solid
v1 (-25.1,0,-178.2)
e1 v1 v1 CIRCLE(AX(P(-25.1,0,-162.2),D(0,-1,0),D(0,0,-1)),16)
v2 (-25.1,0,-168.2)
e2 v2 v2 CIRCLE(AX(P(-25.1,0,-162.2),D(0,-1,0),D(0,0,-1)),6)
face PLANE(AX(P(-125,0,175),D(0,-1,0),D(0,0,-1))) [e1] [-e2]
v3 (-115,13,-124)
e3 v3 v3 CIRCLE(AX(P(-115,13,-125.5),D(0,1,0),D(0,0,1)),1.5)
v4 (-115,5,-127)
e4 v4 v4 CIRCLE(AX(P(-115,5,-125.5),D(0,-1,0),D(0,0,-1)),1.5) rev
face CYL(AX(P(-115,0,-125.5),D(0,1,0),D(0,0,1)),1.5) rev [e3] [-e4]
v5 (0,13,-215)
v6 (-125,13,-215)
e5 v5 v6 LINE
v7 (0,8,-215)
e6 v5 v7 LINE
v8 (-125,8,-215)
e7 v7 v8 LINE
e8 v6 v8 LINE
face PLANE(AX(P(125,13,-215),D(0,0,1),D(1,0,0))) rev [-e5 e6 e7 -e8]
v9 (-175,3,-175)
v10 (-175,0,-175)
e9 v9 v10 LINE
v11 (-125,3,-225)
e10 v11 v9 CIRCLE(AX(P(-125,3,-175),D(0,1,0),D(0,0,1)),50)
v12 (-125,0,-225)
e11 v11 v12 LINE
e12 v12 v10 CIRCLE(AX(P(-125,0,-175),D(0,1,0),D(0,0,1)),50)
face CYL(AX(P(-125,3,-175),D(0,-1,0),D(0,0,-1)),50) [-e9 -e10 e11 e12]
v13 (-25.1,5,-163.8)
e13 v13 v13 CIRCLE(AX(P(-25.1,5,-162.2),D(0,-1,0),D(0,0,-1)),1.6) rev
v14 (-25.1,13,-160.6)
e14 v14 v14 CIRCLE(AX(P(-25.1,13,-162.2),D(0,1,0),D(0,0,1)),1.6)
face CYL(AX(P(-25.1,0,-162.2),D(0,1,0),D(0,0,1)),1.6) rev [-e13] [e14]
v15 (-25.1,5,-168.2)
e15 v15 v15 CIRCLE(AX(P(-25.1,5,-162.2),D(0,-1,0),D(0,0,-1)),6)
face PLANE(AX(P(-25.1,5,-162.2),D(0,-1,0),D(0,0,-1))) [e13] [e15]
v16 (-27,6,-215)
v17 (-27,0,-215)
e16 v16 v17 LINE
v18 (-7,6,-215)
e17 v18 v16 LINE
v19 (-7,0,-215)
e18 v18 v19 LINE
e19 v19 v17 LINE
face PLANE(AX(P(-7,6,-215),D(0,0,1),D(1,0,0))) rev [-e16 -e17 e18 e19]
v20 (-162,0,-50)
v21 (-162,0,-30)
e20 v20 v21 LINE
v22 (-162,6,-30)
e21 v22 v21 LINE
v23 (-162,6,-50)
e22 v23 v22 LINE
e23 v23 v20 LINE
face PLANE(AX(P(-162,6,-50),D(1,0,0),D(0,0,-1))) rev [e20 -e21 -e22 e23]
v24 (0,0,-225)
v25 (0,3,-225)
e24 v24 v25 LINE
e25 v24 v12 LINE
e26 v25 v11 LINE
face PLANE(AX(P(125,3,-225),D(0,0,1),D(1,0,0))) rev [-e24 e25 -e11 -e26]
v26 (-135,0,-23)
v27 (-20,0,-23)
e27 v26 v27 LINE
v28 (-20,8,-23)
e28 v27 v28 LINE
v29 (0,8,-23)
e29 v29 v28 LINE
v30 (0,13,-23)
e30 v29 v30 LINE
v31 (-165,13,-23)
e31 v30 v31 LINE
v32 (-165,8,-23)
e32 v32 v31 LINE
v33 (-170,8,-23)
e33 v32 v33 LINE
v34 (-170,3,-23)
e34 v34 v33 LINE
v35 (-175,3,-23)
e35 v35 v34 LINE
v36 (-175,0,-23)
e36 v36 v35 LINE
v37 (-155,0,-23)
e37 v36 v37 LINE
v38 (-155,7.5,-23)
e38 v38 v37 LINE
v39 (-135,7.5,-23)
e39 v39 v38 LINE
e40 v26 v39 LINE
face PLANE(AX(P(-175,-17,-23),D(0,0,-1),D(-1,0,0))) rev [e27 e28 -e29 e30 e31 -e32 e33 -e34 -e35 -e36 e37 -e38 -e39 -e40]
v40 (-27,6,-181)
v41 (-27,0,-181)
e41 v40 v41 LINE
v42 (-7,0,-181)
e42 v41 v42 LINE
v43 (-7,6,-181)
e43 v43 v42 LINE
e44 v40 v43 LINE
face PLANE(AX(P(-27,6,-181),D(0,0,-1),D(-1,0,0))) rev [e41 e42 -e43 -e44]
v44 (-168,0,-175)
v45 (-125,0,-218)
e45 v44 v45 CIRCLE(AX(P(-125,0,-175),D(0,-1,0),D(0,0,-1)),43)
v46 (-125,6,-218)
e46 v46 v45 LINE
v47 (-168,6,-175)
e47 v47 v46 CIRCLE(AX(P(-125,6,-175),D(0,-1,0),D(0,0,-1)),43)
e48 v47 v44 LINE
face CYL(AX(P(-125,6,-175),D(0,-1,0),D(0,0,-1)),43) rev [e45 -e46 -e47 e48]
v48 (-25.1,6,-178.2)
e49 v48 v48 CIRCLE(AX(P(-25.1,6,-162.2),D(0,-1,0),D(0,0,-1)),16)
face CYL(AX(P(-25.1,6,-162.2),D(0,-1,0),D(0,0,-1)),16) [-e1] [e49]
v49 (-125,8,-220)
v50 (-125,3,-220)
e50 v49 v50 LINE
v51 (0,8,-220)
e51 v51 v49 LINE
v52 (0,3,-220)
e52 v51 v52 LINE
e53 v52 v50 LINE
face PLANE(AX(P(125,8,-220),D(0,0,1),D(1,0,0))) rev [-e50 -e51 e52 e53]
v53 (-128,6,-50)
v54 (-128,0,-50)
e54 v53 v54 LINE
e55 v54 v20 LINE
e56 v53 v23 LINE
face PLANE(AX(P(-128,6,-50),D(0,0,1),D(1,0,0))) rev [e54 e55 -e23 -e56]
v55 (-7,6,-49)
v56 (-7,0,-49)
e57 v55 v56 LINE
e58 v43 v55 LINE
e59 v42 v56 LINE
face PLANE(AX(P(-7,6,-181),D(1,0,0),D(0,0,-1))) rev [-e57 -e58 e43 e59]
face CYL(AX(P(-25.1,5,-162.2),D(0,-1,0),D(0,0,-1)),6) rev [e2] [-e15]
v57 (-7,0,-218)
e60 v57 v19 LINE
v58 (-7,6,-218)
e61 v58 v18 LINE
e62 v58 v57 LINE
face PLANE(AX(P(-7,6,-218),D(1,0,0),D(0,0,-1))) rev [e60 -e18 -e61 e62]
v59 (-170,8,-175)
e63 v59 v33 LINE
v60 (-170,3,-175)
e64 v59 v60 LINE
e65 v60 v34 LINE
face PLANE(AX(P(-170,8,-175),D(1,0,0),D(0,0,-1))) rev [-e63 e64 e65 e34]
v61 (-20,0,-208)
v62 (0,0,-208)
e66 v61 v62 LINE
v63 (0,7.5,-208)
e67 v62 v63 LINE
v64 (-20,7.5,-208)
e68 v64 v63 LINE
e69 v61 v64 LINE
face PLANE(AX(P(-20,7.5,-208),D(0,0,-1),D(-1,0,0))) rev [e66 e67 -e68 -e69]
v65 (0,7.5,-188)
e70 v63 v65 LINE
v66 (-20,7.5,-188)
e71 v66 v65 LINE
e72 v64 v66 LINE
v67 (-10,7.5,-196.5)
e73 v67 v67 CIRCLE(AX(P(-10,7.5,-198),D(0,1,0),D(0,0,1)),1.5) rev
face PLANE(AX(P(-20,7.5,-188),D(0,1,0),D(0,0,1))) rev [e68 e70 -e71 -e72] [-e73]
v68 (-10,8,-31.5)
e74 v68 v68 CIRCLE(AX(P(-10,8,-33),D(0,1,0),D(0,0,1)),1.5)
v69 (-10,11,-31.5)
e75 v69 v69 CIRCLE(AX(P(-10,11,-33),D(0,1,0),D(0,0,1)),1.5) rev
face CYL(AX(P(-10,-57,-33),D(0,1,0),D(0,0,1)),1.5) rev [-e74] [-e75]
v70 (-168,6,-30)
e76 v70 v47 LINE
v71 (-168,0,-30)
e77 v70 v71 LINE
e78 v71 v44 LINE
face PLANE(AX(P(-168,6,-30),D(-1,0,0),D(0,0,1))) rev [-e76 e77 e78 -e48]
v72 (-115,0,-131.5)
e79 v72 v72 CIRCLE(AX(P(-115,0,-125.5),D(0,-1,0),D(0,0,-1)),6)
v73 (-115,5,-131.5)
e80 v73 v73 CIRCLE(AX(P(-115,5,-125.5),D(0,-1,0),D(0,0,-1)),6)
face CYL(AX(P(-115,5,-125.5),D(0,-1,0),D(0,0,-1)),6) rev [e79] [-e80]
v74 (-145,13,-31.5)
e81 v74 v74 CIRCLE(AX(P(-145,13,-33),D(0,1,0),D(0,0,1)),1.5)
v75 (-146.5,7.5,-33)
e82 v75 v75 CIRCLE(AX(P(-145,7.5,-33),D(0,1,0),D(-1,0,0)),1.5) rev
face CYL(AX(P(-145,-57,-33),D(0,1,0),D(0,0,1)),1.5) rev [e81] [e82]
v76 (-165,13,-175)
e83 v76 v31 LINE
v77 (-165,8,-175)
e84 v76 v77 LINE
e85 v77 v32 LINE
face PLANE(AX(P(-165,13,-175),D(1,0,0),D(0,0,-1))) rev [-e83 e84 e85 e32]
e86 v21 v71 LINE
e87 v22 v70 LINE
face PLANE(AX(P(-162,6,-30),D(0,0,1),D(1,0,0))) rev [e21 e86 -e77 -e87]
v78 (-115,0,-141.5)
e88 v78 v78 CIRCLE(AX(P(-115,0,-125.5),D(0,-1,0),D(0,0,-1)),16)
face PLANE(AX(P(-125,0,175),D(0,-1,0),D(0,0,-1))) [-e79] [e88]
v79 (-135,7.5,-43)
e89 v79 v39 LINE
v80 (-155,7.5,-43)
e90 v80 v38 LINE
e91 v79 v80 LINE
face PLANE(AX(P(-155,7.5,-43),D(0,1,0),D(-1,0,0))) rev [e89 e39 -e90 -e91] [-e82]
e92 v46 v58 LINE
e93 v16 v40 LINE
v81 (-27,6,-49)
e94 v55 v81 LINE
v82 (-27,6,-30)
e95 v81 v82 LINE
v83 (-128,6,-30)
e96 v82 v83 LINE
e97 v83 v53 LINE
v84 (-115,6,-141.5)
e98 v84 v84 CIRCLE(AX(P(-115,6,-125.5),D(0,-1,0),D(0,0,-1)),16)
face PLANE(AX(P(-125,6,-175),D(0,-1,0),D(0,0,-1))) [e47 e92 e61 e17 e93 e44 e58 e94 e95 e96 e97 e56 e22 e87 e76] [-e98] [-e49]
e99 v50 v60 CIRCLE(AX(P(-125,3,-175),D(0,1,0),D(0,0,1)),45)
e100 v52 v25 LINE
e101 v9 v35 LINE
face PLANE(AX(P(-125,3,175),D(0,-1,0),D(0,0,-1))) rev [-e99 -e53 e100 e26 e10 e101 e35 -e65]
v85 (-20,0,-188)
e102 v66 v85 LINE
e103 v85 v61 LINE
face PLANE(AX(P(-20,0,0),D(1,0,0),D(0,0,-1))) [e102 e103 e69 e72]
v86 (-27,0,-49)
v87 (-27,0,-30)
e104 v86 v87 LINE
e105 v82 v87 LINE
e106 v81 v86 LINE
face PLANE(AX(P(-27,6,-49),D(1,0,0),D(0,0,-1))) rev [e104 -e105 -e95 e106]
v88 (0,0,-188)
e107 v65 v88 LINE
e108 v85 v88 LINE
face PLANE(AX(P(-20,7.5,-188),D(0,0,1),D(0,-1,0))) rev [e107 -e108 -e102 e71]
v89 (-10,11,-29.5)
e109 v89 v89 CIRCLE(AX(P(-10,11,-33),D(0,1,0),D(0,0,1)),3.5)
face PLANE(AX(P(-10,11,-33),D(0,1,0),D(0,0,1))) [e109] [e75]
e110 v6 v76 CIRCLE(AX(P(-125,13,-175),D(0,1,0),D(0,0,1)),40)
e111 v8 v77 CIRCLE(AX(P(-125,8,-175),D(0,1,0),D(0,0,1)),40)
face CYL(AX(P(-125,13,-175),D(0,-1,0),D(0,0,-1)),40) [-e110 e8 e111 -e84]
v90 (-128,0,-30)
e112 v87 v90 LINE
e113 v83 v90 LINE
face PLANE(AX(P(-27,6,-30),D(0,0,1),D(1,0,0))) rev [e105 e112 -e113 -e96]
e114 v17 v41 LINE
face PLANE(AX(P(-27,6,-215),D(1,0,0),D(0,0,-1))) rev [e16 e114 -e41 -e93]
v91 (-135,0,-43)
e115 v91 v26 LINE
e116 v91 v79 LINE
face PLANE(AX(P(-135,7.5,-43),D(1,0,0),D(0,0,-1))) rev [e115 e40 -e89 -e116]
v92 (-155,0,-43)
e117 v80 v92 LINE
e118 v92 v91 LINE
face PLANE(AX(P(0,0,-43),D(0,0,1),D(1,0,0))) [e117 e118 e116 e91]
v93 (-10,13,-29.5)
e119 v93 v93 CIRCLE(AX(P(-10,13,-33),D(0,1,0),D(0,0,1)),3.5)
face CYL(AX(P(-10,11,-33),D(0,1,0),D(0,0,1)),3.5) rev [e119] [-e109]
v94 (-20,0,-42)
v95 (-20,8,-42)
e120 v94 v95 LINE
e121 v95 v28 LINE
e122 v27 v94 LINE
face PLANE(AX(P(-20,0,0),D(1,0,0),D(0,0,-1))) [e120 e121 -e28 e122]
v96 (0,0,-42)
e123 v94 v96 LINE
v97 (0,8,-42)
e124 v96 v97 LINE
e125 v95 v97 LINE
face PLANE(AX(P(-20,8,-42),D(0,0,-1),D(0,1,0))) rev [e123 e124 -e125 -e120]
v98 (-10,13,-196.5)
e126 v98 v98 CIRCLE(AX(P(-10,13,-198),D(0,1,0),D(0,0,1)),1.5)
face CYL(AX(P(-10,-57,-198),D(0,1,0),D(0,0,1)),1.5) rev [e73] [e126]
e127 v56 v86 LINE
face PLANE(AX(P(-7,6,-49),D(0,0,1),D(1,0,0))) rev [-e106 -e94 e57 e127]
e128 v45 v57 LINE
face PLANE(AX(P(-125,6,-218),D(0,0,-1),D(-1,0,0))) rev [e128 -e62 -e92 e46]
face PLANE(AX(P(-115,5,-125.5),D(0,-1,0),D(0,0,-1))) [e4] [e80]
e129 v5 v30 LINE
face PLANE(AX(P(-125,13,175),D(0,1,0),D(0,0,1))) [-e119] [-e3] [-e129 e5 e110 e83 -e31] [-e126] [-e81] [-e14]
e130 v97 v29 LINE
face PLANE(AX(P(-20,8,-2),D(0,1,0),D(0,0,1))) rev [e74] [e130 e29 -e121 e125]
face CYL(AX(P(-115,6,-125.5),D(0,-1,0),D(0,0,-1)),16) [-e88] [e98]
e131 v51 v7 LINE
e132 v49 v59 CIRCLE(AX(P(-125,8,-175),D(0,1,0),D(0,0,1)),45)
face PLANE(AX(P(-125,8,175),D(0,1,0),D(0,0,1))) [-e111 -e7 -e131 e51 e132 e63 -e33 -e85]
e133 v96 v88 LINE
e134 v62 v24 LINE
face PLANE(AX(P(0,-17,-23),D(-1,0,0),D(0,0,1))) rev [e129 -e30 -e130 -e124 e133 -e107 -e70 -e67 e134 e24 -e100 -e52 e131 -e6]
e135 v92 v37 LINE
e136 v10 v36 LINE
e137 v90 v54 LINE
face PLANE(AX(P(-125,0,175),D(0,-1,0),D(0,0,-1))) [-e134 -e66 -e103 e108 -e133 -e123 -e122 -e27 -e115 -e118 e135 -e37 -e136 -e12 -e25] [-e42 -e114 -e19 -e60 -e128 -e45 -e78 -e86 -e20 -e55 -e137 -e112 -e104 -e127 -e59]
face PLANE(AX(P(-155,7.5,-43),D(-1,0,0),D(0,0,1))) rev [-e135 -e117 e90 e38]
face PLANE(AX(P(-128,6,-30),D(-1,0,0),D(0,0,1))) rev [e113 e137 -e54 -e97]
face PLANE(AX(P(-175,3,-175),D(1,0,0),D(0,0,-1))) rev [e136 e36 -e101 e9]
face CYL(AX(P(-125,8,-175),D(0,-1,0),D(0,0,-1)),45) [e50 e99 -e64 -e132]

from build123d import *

# Parameters (mm, degrees)
SALIENTE_EXTRUIR1_DEPTH = 3
SALIENTE_EXTRUIR2_DEPTH = 5
SALIENTE_EXTRUIR3_DEPTH = 5
CROQUIS6_R              = 2.25
CORTAR_EXTRUIR3_DEPTH   = 5
CROQUIS7_R              = 1.5
CORTAR_EXTRUIR4_DEPTH   = 286.340147894
CORTAR_EXTRUIR5_DEPTH   = 8
CROQUIS9_R              = 1.5
CORTAR_EXTRUIR6_DEPTH   = 286.340147894
CROQUIS10_W             = 25
CROQUIS10_H             = 50
CORTAR_EXTRUIR7_DEPTH   = 5
CHAFL_N1_SIZE           = 5
CROQUIS13_R             = 3.5
CROQUIS13_R_2           = 2.25
SALIENTE_EXTRUIR4_DEPTH = 25
CROQUIS14_R             = 3
CROQUIS14_R_2           = 1.25
CROQUIS14_R_3           = 1.5
SALIENTE_EXTRUIR5_DEPTH = 10
CROQUIS12_R             = 1.6
CORTAR_EXTRUIR9_DEPTH   = 287.138078556
CROQUIS11_R             = 6
CORTAR_EXTRUIR8_DEPTH   = 5
CROQUIS16_W             = 40
CROQUIS16_H             = 8
CORTAR_EXTRUIR10_DEPTH  = 20
CORTAR_EXTRUIR11_DEPTH  = 30
CROQUIS19_R             = 1.5
CORTAR_EXTRUIR12_DEPTH  = 70
CROQUIS20_W             = 20
CROQUIS20_H             = 7.5
CORTAR_EXTRUIR13_DEPTH  = 20
CROQUIS21_W             = 20
CROQUIS21_H             = 7.5
CORTAR_EXTRUIR14_DEPTH  = 20
CROQUIS22_R             = 16
CORTAR_EXTRUIR15_DEPTH  = 6
CROQUIS23_R             = 3.5
CORTAR_EXTRUIR16_DEPTH  = 2


with BuildPart() as part:
    # Croquis1 → Saliente-Extruir1 (new body)
    with BuildSketch(Plane(origin=(0, 0, 0), x_dir=(1, 0, 0), z_dir=(0, 1, 0))):
        with BuildLine():
            Line((125, 225), (-125, 225))
            ThreePointArc((-125, 225), (-160.355339059, 210.355339059), (-175, 175))
            Line((-175, 175), (-175, -175))
            ThreePointArc((-175, -175), (-160.355339059, -210.355339059), (-125, -225))
            Line((-125, -225), (125, -225))
            ThreePointArc((125, -225), (160.355339059, -210.355339059), (175, -175))
            Line((175, -175), (175, 175))
            ThreePointArc((175, 175), (160.355339059, 210.355339059), (125, 225))
        make_face()
    extrude(amount=SALIENTE_EXTRUIR1_DEPTH)

    # Croquis2 → Saliente-Extruir2 (add)
    with BuildSketch(Plane(origin=(0, 3, 0), x_dir=(1, 0, 0), z_dir=(0, 1, 0))):
        with BuildLine():
            Line((-125, -220), (125, -220))
            ThreePointArc((125, -220), (156.819805153, -206.819805153), (170, -175))
            Line((170, -175), (170, 175))
            ThreePointArc((170, 175), (156.819805153, 206.819805153), (125, 220))
            Line((125, 220), (-125, 220))
            ThreePointArc((-125, 220), (-156.819805153, 206.819805153), (-170, 175))
            Line((-170, 175), (-170, -175))
            ThreePointArc((-170, -175), (-156.819805153, -206.819805153), (-125, -220))
        make_face()
    extrude(amount=SALIENTE_EXTRUIR2_DEPTH)

    # Croquis3 → Saliente-Extruir3 (add)
    with BuildSketch(Plane(origin=(0, 8, 0), x_dir=(1, 0, 0), z_dir=(0, 1, 0))):
        with BuildLine():
            Line((-125, -215), (125, -215))
            ThreePointArc((125, -215), (153.284271247, -203.284271247), (165, -175))
            Line((165, -175), (165, 175))
            ThreePointArc((165, 175), (153.284271247, 203.284271247), (125, 215))
            Line((125, 215), (-125, 215))
            ThreePointArc((-125, 215), (-153.284271247, 203.284271247), (-165, 175))
            Line((-165, 175), (-165, -175))
            ThreePointArc((-165, -175), (-153.284271247, -203.284271247), (-125, -215))
        make_face()
    extrude(amount=SALIENTE_EXTRUIR3_DEPTH)

    # Croquis6 → Cortar-Extruir3 (cut)
    with BuildSketch(Plane(origin=(0, 13, 0), x_dir=(1, 0, 0), z_dir=(0, 1, 0))):
        with Locations(Location((-87, -130, 0), (0, 0, 270))):
            Circle(CROQUIS6_R)
        with Locations(Location((-87, -70, 0), (0, 0, 270))):
            Circle(CROQUIS6_R)
        with Locations(Location((-87, -10, 0), (0, 0, 270))):
            Circle(CROQUIS6_R)
        with Locations(Location((87, -130, 0), (0, 0, 90))):
            Circle(CROQUIS6_R)
        with Locations(Location((87, -70, 0), (0, 0, 90))):
            Circle(CROQUIS6_R)
        with Locations(Location((87, -10, 0), (0, 0, 90))):
            Circle(CROQUIS6_R)
    extrude(amount=-CORTAR_EXTRUIR3_DEPTH, mode=Mode.SUBTRACT)

    # Croquis7 → Cortar-Extruir4 (cut, through all)
    with BuildSketch(Plane(origin=(0, 13, 0), x_dir=(1, 0, 0), z_dir=(0, 1, 0))):
        with Locations(Location((-115, -70, 0), (0, 0, 270))):
            Circle(CROQUIS7_R)
        with Locations(Location((-115, 125.5, 0), (0, 0, 270))):
            Circle(CROQUIS7_R)
        with Locations(Location((115, -70, 0), (0, 0, 90))):
            Circle(CROQUIS7_R)
        with Locations(Location((115, 125.5, 0), (0, 0, 90))):
            Circle(CROQUIS7_R)
    extrude(amount=-CORTAR_EXTRUIR4_DEPTH, mode=Mode.SUBTRACT)

    # Croquis8 → Cortar-Extruir5 (cut)
    with BuildSketch(Plane(origin=(0, 13, 0), x_dir=(1, 0, 0), z_dir=(0, 1, 0))):
        with BuildLine():
            Line((16.014653583, -158), (16.014653583, -178))
            ThreePointArc((16.014653583, -178), (13.014653583, -181), (10.014653583, -178))
            Line((10.014653583, -178), (10.014653583, -158))
            ThreePointArc((10.014653583, -158), (13.014653583, -155), (16.014653583, -158))
        make_face()
        with BuildLine():
            Line((28.014653583, -158), (28.014653583, -178))
            ThreePointArc((28.014653583, -178), (25.014653583, -181), (22.014653583, -178))
            Line((22.014653583, -178), (22.014653583, -158))
            ThreePointArc((22.014653583, -158), (25.014653583, -155), (28.014653583, -158))
        make_face()
        with BuildLine():
            Line((28.014653583, -106), (28.014653583, -126))
            ThreePointArc((28.014653583, -126), (25.014653583, -129), (22.014653583, -126))
            Line((22.014653583, -126), (22.014653583, -106))
            ThreePointArc((22.014653583, -106), (25.014653583, -103), (28.014653583, -106))
        make_face()
        with BuildLine():
            Line((16.014653583, -106), (16.014653583, -126))
            ThreePointArc((16.014653583, -126), (13.014653583, -129), (10.014653583, -126))
            Line((10.014653583, -126), (10.014653583, -106))
            ThreePointArc((10.014653583, -106), (13.014653583, -103), (16.014653583, -106))
        make_face()
    extrude(amount=-CORTAR_EXTRUIR5_DEPTH, mode=Mode.SUBTRACT)

    # Croquis9 → Cortar-Extruir6 (cut, through all)
    with BuildSketch(Plane(origin=(0, 13, 0), x_dir=(1, 0, 0), z_dir=(0, 1, 0))):
        with Locations(Location((13.014653583, -168, 0), (0, 0, 270))):
            Circle(CROQUIS9_R)
        with Locations(Location((25.014653583, -168, 0), (0, 0, 270))):
            Circle(CROQUIS9_R)
        with Locations(Location((13.014653583, -116, 0), (0, 0, 270))):
            Circle(CROQUIS9_R)
        with Locations(Location((25.014653583, -116, 0), (0, 0, 270))):
            Circle(CROQUIS9_R)
        with Locations(Location((-87, -130, 0), (0, 0, 270))):
            Circle(CROQUIS9_R)
        with Locations(Location((-87, -70, 0), (0, 0, 270))):
            Circle(CROQUIS9_R)
        with Locations(Location((-87, -10, 0), (0, 0, 270))):
            Circle(CROQUIS9_R)
        with Locations(Location((87, -10, 0), (0, 0, 270))):
            Circle(CROQUIS9_R)
        with Locations(Location((87, -70, 0), (0, 0, 270))):
            Circle(CROQUIS9_R)
        with Locations(Location((87, -130, 0), (0, 0, 270))):
            Circle(CROQUIS9_R)
    extrude(amount=-CORTAR_EXTRUIR6_DEPTH, mode=Mode.SUBTRACT)

    # Croquis10 → Cortar-Extruir7 (cut)
    with BuildSketch(Plane(origin=(0, 13, 0), x_dir=(1, 0, 0), z_dir=(0, 1, 0))):
        with Locations((62.5, -145)):
            Rectangle(CROQUIS10_W, CROQUIS10_H)
    extrude(amount=-CORTAR_EXTRUIR7_DEPTH, mode=Mode.SUBTRACT)

    # Chaflán1
    chafl_n1_edges = [part.edges().sort_by_distance(p)[0] for p in [
        (62.5, 13, 120),
        (50, 13, 145),
        (62.5, 13, 170),
        (75, 13, 145),
    ]]
    chamfer(chafl_n1_edges, length=CHAFL_N1_SIZE - 0.0001)  # a hair under: the kernel refuses the full size

    # Croquis13 → Saliente-Extruir4 (add)
    # profile 1 of 4: a face of its own
    with BuildSketch(Plane(origin=(0, 13, 0), x_dir=(1, 0, 0), z_dir=(0, 1, 0))):
        with Locations(Location((-20, -50, 0), (0, 0, 270))):
            Circle(CROQUIS13_R)
        with Locations(Location((-20, -50, 0), (0, 0, 270))):
            Circle(CROQUIS13_R_2, mode=Mode.SUBTRACT)
    # profile 2 of 4: a face of its own
    with BuildSketch(Plane(origin=(0, 13, 0), x_dir=(1, 0, 0), z_dir=(0, 1, 0))):
        with Locations(Location((-60, -50, 0), (0, 0, 270))):
            Circle(CROQUIS13_R)
        with Locations(Location((-60, -50, 0), (0, 0, 270))):
            Circle(CROQUIS13_R_2, mode=Mode.SUBTRACT)
    # profile 3 of 4: a face of its own
    with BuildSketch(Plane(origin=(0, 13, 0), x_dir=(1, 0, 0), z_dir=(0, 1, 0))):
        with Locations(Location((-60, -90, 0), (0, 0, 270))):
            Circle(CROQUIS13_R)
        with Locations(Location((-60, -90, 0), (0, 0, 270))):
            Circle(CROQUIS13_R_2, mode=Mode.SUBTRACT)
    # profile 4 of 4: a face of its own
    with BuildSketch(Plane(origin=(0, 13, 0), x_dir=(1, 0, 0), z_dir=(0, 1, 0))):
        with Locations(Location((-20, -90, 0), (0, 0, 270))):
            Circle(CROQUIS13_R)
        with Locations(Location((-20, -90, 0), (0, 0, 270))):
            Circle(CROQUIS13_R_2, mode=Mode.SUBTRACT)
    extrude(amount=SALIENTE_EXTRUIR4_DEPTH)

    # Croquis14 → Saliente-Extruir5 (add)
    # profile 1 of 6: a face of its own
    with BuildSketch(Plane(origin=(0, 13, 0), x_dir=(1, 0, 0), z_dir=(0, 1, 0))):
        with Locations(Location((67.55, -40, 0), (0, 0, 270))):
            Circle(CROQUIS14_R)
        with Locations(Location((67.55, -40, 0), (0, 0, 270))):
            Circle(CROQUIS14_R_2, mode=Mode.SUBTRACT)
    # profile 2 of 6: a face of its own
    with BuildSketch(Plane(origin=(0, 13, 0), x_dir=(1, 0, 0), z_dir=(0, 1, 0))):
        with Locations(Location((3.15, -40, 0), (0, 0, 270))):
            Circle(CROQUIS14_R)
        with Locations(Location((3.15, -40, 0), (0, 0, 270))):
            Circle(CROQUIS14_R_2, mode=Mode.SUBTRACT)
    # profile 3 of 6: a face of its own
    with BuildSketch(Plane(origin=(0, 13, 0), x_dir=(1, 0, 0), z_dir=(0, 1, 0))):
        with Locations(Location((3, -91.9, 0), (0, 0, 270))):
            Circle(CROQUIS14_R)
        with Locations(Location((3, -91.9, 0), (0, 0, 270))):
            Circle(CROQUIS14_R_2, mode=Mode.SUBTRACT)
    # profile 4 of 6: a face of its own
    with BuildSketch(Plane(origin=(0, 13, 0), x_dir=(1, 0, 0), z_dir=(0, 1, 0))):
        with Locations(Location((67.4, -91.9, 0), (0, 0, 270))):
            Circle(CROQUIS14_R)
        with Locations(Location((67.4, -91.9, 0), (0, 0, 270))):
            Circle(CROQUIS14_R_2, mode=Mode.SUBTRACT)
    # profile 5 of 6: a face of its own
    with BuildSketch(Plane(origin=(0, 13, 0), x_dir=(1, 0, 0), z_dir=(0, 1, 0))):
        with Locations(Location((-10, -102.9, 0), (0, 0, 270))):
            Circle(CROQUIS14_R)
        with Locations(Location((-10, -102.9, 0), (0, 0, 270))):
            Circle(CROQUIS14_R_3, mode=Mode.SUBTRACT)
    # profile 6 of 6: a face of its own
    with BuildSketch(Plane(origin=(0, 13, 0), x_dir=(1, 0, 0), z_dir=(0, 1, 0))):
        with Locations(Location((-10, -118.108484849, 0), (0, 0, 270))):
            Circle(CROQUIS14_R)
        with Locations(Location((-10, -118.108484849, 0), (0, 0, 270))):
            Circle(CROQUIS14_R_3, mode=Mode.SUBTRACT)
    extrude(amount=SALIENTE_EXTRUIR5_DEPTH)

    # Croquis12 → Cortar-Extruir9 (cut, through all)
    with BuildSketch(Plane(origin=(0, 13, 0), x_dir=(1, 0, 0), z_dir=(0, 1, 0))):
        with Locations(Location((-25.1, 162.2, 0), (0, 0, 270))):
            Circle(CROQUIS12_R)
        with Locations(Location((25.1, 162.2, 0), (0, 0, 270))):
            Circle(CROQUIS12_R)
        with Locations(Location((-25.1, 12, 0), (0, 0, 270))):
            Circle(CROQUIS12_R)
        with Locations(Location((25.1, 12, 0), (0, 0, 270))):
            Circle(CROQUIS12_R)
    extrude(amount=-CORTAR_EXTRUIR9_DEPTH, mode=Mode.SUBTRACT)

    # Croquis11 → Cortar-Extruir8 (cut)
    with BuildSketch(Plane.XZ):
        with Locations(Location((87, 130, 0), (0, 0, 270))):
            Circle(CROQUIS11_R)
        with Locations(Location((87, 70, 0), (0, 0, 270))):
            Circle(CROQUIS11_R)
        with Locations(Location((87, 10, 0), (0, 0, 270))):
            Circle(CROQUIS11_R)
        with Locations(Location((-87, 10, 0), (0, 0, 270))):
            Circle(CROQUIS11_R)
        with Locations(Location((-87, 70, 0), (0, 0, 270))):
            Circle(CROQUIS11_R)
        with Locations(Location((-87, 130, 0), (0, 0, 270))):
            Circle(CROQUIS11_R)
        with Locations(Location((-115, 70, 0), (0, 0, 270))):
            Circle(CROQUIS11_R)
        with Locations(Location((115, 70, 0), (0, 0, 270))):
            Circle(CROQUIS11_R)
        with Locations(Location((115, -125.5, 0), (0, 0, 270))):
            Circle(CROQUIS11_R)
        with Locations(Location((-115, -125.5, 0), (0, 0, 270))):
            Circle(CROQUIS11_R)
        with Locations(Location((-25.1, -162.2, 0), (0, 0, 270))):
            Circle(CROQUIS11_R)
        with Locations(Location((25.1, -162.2, 0), (0, 0, 270))):
            Circle(CROQUIS11_R)
        with Locations(Location((-25.1, -12, 0), (0, 0, 270))):
            Circle(CROQUIS11_R)
        with Locations(Location((25.1, -12, 0), (0, 0, 270))):
            Circle(CROQUIS11_R)
        with BuildLine():
            Line((13.014653583, 188), (25.014653583, 188))
            ThreePointArc((25.014653583, 188), (45.014653583, 168), (25.014653583, 148))
            Line((25.014653583, 148), (13.014653583, 148))
            ThreePointArc((13.014653583, 148), (-6.985346417, 168), (13.014653583, 188))
        make_face()
        with BuildLine():
            Line((13.014653583, 136), (25.014653583, 136))
            ThreePointArc((25.014653583, 136), (45.014653583, 116), (25.014653583, 96))
            Line((25.014653583, 96), (13.014653583, 96))
            ThreePointArc((13.014653583, 96), (-6.985346417, 116), (13.014653583, 136))
        make_face()
    extrude(amount=-CORTAR_EXTRUIR8_DEPTH, mode=Mode.SUBTRACT)

    # Croquis16 → Cortar-Extruir10 (cut, symmetric)
    with BuildSketch(Plane(origin=(0, 0, 0), x_dir=(0, 0, -1), z_dir=(1, 0, 0))):
        with Locations((22, 4)):
            Rectangle(CROQUIS16_W, CROQUIS16_H)
    extrude(amount=CORTAR_EXTRUIR10_DEPTH, both=True, mode=Mode.SUBTRACT)

    # Croquis17 → Cortar-Extruir11 (cut, symmetric)
    with BuildSketch(Plane(origin=(0, 13, 0), x_dir=(1, 0, 0), z_dir=(0, 1, 0))):
        Polygon((-175, 23), (0, 23), (0, 225), (175, 225), (175, 23), (175, -225), (0, -225), (-175, -225), align=None)
    extrude(amount=CORTAR_EXTRUIR11_DEPTH, both=True, mode=Mode.SUBTRACT)

    # Croquis19 → Cortar-Extruir12 (cut)
    with BuildSketch(Plane(origin=(0, 13, 0), x_dir=(1, 0, 0), z_dir=(0, 1, 0))):
        with Locations(Location((-10, 33, 0), (0, 0, 270))):
            Circle(CROQUIS19_R)
        with Locations(Location((-10, 198, 0), (0, 0, 270))):
            Circle(CROQUIS19_R)
        with Locations(Location((-145, 33, 0), (0, 0, 270))):
            Circle(CROQUIS19_R)
    extrude(amount=-CORTAR_EXTRUIR12_DEPTH, mode=Mode.SUBTRACT)

    # Croquis20 → Cortar-Extruir13 (cut)
    with BuildSketch(Plane(origin=(0, 0, 0), x_dir=(0, 0, -1), z_dir=(1, 0, 0))):
        with Locations((198, 3.75)):
            Rectangle(CROQUIS20_W, CROQUIS20_H)
    extrude(amount=-CORTAR_EXTRUIR13_DEPTH, mode=Mode.SUBTRACT)

    # Croquis21 → Cortar-Extruir14 (cut)
    with BuildSketch(Plane.XY.offset(-23)):
        with Locations((-145, 3.75)):
            Rectangle(CROQUIS21_W, CROQUIS21_H)
    extrude(amount=-CORTAR_EXTRUIR14_DEPTH, mode=Mode.SUBTRACT)

    # Croquis22 → Cortar-Extruir15 (cut)
    with BuildSketch(Plane.XZ):
        with BuildLine():
            Line((-27, -181), (-7, -181))
            Line((-7, -181), (-7, -49))
            Line((-7, -49), (-27, -49))
            Line((-27, -49), (-27, -30))
            Line((-27, -30), (-128, -30))
            Line((-128, -30), (-128, -50))
            Line((-128, -50), (-162, -50))
            Line((-162, -50), (-162, -30))
            Line((-162, -30), (-168, -30))
            Line((-168, -30), (-168, -175))
            ThreePointArc((-168, -175), (-155.405591591, -205.405591591), (-125, -218))
            Line((-125, -218), (-7, -218))
            Line((-7, -218), (-7, -215))
            Line((-7, -215), (-27, -215))
            Line((-27, -215), (-27, -181))
        make_face()
        with Locations(Location((-115, -125.5, 0), (0, 0, 270))):
            Circle(CROQUIS22_R, mode=Mode.SUBTRACT)
        with Locations(Location((-25.1, -162.2, 0), (0, 0, 270))):
            Circle(CROQUIS22_R, mode=Mode.SUBTRACT)
    extrude(amount=-CORTAR_EXTRUIR15_DEPTH, mode=Mode.SUBTRACT)

    # Croquis23 → Cortar-Extruir16 (cut)
    with BuildSketch(Plane(origin=(0, 13, 0), x_dir=(1, 0, 0), z_dir=(0, 1, 0))):
        with Locations(Location((-10, 33, 0), (0, 0, 270))):
            Circle(CROQUIS23_R)
    extrude(amount=-CORTAR_EXTRUIR16_DEPTH, mode=Mode.SUBTRACT)


solid = part.part
